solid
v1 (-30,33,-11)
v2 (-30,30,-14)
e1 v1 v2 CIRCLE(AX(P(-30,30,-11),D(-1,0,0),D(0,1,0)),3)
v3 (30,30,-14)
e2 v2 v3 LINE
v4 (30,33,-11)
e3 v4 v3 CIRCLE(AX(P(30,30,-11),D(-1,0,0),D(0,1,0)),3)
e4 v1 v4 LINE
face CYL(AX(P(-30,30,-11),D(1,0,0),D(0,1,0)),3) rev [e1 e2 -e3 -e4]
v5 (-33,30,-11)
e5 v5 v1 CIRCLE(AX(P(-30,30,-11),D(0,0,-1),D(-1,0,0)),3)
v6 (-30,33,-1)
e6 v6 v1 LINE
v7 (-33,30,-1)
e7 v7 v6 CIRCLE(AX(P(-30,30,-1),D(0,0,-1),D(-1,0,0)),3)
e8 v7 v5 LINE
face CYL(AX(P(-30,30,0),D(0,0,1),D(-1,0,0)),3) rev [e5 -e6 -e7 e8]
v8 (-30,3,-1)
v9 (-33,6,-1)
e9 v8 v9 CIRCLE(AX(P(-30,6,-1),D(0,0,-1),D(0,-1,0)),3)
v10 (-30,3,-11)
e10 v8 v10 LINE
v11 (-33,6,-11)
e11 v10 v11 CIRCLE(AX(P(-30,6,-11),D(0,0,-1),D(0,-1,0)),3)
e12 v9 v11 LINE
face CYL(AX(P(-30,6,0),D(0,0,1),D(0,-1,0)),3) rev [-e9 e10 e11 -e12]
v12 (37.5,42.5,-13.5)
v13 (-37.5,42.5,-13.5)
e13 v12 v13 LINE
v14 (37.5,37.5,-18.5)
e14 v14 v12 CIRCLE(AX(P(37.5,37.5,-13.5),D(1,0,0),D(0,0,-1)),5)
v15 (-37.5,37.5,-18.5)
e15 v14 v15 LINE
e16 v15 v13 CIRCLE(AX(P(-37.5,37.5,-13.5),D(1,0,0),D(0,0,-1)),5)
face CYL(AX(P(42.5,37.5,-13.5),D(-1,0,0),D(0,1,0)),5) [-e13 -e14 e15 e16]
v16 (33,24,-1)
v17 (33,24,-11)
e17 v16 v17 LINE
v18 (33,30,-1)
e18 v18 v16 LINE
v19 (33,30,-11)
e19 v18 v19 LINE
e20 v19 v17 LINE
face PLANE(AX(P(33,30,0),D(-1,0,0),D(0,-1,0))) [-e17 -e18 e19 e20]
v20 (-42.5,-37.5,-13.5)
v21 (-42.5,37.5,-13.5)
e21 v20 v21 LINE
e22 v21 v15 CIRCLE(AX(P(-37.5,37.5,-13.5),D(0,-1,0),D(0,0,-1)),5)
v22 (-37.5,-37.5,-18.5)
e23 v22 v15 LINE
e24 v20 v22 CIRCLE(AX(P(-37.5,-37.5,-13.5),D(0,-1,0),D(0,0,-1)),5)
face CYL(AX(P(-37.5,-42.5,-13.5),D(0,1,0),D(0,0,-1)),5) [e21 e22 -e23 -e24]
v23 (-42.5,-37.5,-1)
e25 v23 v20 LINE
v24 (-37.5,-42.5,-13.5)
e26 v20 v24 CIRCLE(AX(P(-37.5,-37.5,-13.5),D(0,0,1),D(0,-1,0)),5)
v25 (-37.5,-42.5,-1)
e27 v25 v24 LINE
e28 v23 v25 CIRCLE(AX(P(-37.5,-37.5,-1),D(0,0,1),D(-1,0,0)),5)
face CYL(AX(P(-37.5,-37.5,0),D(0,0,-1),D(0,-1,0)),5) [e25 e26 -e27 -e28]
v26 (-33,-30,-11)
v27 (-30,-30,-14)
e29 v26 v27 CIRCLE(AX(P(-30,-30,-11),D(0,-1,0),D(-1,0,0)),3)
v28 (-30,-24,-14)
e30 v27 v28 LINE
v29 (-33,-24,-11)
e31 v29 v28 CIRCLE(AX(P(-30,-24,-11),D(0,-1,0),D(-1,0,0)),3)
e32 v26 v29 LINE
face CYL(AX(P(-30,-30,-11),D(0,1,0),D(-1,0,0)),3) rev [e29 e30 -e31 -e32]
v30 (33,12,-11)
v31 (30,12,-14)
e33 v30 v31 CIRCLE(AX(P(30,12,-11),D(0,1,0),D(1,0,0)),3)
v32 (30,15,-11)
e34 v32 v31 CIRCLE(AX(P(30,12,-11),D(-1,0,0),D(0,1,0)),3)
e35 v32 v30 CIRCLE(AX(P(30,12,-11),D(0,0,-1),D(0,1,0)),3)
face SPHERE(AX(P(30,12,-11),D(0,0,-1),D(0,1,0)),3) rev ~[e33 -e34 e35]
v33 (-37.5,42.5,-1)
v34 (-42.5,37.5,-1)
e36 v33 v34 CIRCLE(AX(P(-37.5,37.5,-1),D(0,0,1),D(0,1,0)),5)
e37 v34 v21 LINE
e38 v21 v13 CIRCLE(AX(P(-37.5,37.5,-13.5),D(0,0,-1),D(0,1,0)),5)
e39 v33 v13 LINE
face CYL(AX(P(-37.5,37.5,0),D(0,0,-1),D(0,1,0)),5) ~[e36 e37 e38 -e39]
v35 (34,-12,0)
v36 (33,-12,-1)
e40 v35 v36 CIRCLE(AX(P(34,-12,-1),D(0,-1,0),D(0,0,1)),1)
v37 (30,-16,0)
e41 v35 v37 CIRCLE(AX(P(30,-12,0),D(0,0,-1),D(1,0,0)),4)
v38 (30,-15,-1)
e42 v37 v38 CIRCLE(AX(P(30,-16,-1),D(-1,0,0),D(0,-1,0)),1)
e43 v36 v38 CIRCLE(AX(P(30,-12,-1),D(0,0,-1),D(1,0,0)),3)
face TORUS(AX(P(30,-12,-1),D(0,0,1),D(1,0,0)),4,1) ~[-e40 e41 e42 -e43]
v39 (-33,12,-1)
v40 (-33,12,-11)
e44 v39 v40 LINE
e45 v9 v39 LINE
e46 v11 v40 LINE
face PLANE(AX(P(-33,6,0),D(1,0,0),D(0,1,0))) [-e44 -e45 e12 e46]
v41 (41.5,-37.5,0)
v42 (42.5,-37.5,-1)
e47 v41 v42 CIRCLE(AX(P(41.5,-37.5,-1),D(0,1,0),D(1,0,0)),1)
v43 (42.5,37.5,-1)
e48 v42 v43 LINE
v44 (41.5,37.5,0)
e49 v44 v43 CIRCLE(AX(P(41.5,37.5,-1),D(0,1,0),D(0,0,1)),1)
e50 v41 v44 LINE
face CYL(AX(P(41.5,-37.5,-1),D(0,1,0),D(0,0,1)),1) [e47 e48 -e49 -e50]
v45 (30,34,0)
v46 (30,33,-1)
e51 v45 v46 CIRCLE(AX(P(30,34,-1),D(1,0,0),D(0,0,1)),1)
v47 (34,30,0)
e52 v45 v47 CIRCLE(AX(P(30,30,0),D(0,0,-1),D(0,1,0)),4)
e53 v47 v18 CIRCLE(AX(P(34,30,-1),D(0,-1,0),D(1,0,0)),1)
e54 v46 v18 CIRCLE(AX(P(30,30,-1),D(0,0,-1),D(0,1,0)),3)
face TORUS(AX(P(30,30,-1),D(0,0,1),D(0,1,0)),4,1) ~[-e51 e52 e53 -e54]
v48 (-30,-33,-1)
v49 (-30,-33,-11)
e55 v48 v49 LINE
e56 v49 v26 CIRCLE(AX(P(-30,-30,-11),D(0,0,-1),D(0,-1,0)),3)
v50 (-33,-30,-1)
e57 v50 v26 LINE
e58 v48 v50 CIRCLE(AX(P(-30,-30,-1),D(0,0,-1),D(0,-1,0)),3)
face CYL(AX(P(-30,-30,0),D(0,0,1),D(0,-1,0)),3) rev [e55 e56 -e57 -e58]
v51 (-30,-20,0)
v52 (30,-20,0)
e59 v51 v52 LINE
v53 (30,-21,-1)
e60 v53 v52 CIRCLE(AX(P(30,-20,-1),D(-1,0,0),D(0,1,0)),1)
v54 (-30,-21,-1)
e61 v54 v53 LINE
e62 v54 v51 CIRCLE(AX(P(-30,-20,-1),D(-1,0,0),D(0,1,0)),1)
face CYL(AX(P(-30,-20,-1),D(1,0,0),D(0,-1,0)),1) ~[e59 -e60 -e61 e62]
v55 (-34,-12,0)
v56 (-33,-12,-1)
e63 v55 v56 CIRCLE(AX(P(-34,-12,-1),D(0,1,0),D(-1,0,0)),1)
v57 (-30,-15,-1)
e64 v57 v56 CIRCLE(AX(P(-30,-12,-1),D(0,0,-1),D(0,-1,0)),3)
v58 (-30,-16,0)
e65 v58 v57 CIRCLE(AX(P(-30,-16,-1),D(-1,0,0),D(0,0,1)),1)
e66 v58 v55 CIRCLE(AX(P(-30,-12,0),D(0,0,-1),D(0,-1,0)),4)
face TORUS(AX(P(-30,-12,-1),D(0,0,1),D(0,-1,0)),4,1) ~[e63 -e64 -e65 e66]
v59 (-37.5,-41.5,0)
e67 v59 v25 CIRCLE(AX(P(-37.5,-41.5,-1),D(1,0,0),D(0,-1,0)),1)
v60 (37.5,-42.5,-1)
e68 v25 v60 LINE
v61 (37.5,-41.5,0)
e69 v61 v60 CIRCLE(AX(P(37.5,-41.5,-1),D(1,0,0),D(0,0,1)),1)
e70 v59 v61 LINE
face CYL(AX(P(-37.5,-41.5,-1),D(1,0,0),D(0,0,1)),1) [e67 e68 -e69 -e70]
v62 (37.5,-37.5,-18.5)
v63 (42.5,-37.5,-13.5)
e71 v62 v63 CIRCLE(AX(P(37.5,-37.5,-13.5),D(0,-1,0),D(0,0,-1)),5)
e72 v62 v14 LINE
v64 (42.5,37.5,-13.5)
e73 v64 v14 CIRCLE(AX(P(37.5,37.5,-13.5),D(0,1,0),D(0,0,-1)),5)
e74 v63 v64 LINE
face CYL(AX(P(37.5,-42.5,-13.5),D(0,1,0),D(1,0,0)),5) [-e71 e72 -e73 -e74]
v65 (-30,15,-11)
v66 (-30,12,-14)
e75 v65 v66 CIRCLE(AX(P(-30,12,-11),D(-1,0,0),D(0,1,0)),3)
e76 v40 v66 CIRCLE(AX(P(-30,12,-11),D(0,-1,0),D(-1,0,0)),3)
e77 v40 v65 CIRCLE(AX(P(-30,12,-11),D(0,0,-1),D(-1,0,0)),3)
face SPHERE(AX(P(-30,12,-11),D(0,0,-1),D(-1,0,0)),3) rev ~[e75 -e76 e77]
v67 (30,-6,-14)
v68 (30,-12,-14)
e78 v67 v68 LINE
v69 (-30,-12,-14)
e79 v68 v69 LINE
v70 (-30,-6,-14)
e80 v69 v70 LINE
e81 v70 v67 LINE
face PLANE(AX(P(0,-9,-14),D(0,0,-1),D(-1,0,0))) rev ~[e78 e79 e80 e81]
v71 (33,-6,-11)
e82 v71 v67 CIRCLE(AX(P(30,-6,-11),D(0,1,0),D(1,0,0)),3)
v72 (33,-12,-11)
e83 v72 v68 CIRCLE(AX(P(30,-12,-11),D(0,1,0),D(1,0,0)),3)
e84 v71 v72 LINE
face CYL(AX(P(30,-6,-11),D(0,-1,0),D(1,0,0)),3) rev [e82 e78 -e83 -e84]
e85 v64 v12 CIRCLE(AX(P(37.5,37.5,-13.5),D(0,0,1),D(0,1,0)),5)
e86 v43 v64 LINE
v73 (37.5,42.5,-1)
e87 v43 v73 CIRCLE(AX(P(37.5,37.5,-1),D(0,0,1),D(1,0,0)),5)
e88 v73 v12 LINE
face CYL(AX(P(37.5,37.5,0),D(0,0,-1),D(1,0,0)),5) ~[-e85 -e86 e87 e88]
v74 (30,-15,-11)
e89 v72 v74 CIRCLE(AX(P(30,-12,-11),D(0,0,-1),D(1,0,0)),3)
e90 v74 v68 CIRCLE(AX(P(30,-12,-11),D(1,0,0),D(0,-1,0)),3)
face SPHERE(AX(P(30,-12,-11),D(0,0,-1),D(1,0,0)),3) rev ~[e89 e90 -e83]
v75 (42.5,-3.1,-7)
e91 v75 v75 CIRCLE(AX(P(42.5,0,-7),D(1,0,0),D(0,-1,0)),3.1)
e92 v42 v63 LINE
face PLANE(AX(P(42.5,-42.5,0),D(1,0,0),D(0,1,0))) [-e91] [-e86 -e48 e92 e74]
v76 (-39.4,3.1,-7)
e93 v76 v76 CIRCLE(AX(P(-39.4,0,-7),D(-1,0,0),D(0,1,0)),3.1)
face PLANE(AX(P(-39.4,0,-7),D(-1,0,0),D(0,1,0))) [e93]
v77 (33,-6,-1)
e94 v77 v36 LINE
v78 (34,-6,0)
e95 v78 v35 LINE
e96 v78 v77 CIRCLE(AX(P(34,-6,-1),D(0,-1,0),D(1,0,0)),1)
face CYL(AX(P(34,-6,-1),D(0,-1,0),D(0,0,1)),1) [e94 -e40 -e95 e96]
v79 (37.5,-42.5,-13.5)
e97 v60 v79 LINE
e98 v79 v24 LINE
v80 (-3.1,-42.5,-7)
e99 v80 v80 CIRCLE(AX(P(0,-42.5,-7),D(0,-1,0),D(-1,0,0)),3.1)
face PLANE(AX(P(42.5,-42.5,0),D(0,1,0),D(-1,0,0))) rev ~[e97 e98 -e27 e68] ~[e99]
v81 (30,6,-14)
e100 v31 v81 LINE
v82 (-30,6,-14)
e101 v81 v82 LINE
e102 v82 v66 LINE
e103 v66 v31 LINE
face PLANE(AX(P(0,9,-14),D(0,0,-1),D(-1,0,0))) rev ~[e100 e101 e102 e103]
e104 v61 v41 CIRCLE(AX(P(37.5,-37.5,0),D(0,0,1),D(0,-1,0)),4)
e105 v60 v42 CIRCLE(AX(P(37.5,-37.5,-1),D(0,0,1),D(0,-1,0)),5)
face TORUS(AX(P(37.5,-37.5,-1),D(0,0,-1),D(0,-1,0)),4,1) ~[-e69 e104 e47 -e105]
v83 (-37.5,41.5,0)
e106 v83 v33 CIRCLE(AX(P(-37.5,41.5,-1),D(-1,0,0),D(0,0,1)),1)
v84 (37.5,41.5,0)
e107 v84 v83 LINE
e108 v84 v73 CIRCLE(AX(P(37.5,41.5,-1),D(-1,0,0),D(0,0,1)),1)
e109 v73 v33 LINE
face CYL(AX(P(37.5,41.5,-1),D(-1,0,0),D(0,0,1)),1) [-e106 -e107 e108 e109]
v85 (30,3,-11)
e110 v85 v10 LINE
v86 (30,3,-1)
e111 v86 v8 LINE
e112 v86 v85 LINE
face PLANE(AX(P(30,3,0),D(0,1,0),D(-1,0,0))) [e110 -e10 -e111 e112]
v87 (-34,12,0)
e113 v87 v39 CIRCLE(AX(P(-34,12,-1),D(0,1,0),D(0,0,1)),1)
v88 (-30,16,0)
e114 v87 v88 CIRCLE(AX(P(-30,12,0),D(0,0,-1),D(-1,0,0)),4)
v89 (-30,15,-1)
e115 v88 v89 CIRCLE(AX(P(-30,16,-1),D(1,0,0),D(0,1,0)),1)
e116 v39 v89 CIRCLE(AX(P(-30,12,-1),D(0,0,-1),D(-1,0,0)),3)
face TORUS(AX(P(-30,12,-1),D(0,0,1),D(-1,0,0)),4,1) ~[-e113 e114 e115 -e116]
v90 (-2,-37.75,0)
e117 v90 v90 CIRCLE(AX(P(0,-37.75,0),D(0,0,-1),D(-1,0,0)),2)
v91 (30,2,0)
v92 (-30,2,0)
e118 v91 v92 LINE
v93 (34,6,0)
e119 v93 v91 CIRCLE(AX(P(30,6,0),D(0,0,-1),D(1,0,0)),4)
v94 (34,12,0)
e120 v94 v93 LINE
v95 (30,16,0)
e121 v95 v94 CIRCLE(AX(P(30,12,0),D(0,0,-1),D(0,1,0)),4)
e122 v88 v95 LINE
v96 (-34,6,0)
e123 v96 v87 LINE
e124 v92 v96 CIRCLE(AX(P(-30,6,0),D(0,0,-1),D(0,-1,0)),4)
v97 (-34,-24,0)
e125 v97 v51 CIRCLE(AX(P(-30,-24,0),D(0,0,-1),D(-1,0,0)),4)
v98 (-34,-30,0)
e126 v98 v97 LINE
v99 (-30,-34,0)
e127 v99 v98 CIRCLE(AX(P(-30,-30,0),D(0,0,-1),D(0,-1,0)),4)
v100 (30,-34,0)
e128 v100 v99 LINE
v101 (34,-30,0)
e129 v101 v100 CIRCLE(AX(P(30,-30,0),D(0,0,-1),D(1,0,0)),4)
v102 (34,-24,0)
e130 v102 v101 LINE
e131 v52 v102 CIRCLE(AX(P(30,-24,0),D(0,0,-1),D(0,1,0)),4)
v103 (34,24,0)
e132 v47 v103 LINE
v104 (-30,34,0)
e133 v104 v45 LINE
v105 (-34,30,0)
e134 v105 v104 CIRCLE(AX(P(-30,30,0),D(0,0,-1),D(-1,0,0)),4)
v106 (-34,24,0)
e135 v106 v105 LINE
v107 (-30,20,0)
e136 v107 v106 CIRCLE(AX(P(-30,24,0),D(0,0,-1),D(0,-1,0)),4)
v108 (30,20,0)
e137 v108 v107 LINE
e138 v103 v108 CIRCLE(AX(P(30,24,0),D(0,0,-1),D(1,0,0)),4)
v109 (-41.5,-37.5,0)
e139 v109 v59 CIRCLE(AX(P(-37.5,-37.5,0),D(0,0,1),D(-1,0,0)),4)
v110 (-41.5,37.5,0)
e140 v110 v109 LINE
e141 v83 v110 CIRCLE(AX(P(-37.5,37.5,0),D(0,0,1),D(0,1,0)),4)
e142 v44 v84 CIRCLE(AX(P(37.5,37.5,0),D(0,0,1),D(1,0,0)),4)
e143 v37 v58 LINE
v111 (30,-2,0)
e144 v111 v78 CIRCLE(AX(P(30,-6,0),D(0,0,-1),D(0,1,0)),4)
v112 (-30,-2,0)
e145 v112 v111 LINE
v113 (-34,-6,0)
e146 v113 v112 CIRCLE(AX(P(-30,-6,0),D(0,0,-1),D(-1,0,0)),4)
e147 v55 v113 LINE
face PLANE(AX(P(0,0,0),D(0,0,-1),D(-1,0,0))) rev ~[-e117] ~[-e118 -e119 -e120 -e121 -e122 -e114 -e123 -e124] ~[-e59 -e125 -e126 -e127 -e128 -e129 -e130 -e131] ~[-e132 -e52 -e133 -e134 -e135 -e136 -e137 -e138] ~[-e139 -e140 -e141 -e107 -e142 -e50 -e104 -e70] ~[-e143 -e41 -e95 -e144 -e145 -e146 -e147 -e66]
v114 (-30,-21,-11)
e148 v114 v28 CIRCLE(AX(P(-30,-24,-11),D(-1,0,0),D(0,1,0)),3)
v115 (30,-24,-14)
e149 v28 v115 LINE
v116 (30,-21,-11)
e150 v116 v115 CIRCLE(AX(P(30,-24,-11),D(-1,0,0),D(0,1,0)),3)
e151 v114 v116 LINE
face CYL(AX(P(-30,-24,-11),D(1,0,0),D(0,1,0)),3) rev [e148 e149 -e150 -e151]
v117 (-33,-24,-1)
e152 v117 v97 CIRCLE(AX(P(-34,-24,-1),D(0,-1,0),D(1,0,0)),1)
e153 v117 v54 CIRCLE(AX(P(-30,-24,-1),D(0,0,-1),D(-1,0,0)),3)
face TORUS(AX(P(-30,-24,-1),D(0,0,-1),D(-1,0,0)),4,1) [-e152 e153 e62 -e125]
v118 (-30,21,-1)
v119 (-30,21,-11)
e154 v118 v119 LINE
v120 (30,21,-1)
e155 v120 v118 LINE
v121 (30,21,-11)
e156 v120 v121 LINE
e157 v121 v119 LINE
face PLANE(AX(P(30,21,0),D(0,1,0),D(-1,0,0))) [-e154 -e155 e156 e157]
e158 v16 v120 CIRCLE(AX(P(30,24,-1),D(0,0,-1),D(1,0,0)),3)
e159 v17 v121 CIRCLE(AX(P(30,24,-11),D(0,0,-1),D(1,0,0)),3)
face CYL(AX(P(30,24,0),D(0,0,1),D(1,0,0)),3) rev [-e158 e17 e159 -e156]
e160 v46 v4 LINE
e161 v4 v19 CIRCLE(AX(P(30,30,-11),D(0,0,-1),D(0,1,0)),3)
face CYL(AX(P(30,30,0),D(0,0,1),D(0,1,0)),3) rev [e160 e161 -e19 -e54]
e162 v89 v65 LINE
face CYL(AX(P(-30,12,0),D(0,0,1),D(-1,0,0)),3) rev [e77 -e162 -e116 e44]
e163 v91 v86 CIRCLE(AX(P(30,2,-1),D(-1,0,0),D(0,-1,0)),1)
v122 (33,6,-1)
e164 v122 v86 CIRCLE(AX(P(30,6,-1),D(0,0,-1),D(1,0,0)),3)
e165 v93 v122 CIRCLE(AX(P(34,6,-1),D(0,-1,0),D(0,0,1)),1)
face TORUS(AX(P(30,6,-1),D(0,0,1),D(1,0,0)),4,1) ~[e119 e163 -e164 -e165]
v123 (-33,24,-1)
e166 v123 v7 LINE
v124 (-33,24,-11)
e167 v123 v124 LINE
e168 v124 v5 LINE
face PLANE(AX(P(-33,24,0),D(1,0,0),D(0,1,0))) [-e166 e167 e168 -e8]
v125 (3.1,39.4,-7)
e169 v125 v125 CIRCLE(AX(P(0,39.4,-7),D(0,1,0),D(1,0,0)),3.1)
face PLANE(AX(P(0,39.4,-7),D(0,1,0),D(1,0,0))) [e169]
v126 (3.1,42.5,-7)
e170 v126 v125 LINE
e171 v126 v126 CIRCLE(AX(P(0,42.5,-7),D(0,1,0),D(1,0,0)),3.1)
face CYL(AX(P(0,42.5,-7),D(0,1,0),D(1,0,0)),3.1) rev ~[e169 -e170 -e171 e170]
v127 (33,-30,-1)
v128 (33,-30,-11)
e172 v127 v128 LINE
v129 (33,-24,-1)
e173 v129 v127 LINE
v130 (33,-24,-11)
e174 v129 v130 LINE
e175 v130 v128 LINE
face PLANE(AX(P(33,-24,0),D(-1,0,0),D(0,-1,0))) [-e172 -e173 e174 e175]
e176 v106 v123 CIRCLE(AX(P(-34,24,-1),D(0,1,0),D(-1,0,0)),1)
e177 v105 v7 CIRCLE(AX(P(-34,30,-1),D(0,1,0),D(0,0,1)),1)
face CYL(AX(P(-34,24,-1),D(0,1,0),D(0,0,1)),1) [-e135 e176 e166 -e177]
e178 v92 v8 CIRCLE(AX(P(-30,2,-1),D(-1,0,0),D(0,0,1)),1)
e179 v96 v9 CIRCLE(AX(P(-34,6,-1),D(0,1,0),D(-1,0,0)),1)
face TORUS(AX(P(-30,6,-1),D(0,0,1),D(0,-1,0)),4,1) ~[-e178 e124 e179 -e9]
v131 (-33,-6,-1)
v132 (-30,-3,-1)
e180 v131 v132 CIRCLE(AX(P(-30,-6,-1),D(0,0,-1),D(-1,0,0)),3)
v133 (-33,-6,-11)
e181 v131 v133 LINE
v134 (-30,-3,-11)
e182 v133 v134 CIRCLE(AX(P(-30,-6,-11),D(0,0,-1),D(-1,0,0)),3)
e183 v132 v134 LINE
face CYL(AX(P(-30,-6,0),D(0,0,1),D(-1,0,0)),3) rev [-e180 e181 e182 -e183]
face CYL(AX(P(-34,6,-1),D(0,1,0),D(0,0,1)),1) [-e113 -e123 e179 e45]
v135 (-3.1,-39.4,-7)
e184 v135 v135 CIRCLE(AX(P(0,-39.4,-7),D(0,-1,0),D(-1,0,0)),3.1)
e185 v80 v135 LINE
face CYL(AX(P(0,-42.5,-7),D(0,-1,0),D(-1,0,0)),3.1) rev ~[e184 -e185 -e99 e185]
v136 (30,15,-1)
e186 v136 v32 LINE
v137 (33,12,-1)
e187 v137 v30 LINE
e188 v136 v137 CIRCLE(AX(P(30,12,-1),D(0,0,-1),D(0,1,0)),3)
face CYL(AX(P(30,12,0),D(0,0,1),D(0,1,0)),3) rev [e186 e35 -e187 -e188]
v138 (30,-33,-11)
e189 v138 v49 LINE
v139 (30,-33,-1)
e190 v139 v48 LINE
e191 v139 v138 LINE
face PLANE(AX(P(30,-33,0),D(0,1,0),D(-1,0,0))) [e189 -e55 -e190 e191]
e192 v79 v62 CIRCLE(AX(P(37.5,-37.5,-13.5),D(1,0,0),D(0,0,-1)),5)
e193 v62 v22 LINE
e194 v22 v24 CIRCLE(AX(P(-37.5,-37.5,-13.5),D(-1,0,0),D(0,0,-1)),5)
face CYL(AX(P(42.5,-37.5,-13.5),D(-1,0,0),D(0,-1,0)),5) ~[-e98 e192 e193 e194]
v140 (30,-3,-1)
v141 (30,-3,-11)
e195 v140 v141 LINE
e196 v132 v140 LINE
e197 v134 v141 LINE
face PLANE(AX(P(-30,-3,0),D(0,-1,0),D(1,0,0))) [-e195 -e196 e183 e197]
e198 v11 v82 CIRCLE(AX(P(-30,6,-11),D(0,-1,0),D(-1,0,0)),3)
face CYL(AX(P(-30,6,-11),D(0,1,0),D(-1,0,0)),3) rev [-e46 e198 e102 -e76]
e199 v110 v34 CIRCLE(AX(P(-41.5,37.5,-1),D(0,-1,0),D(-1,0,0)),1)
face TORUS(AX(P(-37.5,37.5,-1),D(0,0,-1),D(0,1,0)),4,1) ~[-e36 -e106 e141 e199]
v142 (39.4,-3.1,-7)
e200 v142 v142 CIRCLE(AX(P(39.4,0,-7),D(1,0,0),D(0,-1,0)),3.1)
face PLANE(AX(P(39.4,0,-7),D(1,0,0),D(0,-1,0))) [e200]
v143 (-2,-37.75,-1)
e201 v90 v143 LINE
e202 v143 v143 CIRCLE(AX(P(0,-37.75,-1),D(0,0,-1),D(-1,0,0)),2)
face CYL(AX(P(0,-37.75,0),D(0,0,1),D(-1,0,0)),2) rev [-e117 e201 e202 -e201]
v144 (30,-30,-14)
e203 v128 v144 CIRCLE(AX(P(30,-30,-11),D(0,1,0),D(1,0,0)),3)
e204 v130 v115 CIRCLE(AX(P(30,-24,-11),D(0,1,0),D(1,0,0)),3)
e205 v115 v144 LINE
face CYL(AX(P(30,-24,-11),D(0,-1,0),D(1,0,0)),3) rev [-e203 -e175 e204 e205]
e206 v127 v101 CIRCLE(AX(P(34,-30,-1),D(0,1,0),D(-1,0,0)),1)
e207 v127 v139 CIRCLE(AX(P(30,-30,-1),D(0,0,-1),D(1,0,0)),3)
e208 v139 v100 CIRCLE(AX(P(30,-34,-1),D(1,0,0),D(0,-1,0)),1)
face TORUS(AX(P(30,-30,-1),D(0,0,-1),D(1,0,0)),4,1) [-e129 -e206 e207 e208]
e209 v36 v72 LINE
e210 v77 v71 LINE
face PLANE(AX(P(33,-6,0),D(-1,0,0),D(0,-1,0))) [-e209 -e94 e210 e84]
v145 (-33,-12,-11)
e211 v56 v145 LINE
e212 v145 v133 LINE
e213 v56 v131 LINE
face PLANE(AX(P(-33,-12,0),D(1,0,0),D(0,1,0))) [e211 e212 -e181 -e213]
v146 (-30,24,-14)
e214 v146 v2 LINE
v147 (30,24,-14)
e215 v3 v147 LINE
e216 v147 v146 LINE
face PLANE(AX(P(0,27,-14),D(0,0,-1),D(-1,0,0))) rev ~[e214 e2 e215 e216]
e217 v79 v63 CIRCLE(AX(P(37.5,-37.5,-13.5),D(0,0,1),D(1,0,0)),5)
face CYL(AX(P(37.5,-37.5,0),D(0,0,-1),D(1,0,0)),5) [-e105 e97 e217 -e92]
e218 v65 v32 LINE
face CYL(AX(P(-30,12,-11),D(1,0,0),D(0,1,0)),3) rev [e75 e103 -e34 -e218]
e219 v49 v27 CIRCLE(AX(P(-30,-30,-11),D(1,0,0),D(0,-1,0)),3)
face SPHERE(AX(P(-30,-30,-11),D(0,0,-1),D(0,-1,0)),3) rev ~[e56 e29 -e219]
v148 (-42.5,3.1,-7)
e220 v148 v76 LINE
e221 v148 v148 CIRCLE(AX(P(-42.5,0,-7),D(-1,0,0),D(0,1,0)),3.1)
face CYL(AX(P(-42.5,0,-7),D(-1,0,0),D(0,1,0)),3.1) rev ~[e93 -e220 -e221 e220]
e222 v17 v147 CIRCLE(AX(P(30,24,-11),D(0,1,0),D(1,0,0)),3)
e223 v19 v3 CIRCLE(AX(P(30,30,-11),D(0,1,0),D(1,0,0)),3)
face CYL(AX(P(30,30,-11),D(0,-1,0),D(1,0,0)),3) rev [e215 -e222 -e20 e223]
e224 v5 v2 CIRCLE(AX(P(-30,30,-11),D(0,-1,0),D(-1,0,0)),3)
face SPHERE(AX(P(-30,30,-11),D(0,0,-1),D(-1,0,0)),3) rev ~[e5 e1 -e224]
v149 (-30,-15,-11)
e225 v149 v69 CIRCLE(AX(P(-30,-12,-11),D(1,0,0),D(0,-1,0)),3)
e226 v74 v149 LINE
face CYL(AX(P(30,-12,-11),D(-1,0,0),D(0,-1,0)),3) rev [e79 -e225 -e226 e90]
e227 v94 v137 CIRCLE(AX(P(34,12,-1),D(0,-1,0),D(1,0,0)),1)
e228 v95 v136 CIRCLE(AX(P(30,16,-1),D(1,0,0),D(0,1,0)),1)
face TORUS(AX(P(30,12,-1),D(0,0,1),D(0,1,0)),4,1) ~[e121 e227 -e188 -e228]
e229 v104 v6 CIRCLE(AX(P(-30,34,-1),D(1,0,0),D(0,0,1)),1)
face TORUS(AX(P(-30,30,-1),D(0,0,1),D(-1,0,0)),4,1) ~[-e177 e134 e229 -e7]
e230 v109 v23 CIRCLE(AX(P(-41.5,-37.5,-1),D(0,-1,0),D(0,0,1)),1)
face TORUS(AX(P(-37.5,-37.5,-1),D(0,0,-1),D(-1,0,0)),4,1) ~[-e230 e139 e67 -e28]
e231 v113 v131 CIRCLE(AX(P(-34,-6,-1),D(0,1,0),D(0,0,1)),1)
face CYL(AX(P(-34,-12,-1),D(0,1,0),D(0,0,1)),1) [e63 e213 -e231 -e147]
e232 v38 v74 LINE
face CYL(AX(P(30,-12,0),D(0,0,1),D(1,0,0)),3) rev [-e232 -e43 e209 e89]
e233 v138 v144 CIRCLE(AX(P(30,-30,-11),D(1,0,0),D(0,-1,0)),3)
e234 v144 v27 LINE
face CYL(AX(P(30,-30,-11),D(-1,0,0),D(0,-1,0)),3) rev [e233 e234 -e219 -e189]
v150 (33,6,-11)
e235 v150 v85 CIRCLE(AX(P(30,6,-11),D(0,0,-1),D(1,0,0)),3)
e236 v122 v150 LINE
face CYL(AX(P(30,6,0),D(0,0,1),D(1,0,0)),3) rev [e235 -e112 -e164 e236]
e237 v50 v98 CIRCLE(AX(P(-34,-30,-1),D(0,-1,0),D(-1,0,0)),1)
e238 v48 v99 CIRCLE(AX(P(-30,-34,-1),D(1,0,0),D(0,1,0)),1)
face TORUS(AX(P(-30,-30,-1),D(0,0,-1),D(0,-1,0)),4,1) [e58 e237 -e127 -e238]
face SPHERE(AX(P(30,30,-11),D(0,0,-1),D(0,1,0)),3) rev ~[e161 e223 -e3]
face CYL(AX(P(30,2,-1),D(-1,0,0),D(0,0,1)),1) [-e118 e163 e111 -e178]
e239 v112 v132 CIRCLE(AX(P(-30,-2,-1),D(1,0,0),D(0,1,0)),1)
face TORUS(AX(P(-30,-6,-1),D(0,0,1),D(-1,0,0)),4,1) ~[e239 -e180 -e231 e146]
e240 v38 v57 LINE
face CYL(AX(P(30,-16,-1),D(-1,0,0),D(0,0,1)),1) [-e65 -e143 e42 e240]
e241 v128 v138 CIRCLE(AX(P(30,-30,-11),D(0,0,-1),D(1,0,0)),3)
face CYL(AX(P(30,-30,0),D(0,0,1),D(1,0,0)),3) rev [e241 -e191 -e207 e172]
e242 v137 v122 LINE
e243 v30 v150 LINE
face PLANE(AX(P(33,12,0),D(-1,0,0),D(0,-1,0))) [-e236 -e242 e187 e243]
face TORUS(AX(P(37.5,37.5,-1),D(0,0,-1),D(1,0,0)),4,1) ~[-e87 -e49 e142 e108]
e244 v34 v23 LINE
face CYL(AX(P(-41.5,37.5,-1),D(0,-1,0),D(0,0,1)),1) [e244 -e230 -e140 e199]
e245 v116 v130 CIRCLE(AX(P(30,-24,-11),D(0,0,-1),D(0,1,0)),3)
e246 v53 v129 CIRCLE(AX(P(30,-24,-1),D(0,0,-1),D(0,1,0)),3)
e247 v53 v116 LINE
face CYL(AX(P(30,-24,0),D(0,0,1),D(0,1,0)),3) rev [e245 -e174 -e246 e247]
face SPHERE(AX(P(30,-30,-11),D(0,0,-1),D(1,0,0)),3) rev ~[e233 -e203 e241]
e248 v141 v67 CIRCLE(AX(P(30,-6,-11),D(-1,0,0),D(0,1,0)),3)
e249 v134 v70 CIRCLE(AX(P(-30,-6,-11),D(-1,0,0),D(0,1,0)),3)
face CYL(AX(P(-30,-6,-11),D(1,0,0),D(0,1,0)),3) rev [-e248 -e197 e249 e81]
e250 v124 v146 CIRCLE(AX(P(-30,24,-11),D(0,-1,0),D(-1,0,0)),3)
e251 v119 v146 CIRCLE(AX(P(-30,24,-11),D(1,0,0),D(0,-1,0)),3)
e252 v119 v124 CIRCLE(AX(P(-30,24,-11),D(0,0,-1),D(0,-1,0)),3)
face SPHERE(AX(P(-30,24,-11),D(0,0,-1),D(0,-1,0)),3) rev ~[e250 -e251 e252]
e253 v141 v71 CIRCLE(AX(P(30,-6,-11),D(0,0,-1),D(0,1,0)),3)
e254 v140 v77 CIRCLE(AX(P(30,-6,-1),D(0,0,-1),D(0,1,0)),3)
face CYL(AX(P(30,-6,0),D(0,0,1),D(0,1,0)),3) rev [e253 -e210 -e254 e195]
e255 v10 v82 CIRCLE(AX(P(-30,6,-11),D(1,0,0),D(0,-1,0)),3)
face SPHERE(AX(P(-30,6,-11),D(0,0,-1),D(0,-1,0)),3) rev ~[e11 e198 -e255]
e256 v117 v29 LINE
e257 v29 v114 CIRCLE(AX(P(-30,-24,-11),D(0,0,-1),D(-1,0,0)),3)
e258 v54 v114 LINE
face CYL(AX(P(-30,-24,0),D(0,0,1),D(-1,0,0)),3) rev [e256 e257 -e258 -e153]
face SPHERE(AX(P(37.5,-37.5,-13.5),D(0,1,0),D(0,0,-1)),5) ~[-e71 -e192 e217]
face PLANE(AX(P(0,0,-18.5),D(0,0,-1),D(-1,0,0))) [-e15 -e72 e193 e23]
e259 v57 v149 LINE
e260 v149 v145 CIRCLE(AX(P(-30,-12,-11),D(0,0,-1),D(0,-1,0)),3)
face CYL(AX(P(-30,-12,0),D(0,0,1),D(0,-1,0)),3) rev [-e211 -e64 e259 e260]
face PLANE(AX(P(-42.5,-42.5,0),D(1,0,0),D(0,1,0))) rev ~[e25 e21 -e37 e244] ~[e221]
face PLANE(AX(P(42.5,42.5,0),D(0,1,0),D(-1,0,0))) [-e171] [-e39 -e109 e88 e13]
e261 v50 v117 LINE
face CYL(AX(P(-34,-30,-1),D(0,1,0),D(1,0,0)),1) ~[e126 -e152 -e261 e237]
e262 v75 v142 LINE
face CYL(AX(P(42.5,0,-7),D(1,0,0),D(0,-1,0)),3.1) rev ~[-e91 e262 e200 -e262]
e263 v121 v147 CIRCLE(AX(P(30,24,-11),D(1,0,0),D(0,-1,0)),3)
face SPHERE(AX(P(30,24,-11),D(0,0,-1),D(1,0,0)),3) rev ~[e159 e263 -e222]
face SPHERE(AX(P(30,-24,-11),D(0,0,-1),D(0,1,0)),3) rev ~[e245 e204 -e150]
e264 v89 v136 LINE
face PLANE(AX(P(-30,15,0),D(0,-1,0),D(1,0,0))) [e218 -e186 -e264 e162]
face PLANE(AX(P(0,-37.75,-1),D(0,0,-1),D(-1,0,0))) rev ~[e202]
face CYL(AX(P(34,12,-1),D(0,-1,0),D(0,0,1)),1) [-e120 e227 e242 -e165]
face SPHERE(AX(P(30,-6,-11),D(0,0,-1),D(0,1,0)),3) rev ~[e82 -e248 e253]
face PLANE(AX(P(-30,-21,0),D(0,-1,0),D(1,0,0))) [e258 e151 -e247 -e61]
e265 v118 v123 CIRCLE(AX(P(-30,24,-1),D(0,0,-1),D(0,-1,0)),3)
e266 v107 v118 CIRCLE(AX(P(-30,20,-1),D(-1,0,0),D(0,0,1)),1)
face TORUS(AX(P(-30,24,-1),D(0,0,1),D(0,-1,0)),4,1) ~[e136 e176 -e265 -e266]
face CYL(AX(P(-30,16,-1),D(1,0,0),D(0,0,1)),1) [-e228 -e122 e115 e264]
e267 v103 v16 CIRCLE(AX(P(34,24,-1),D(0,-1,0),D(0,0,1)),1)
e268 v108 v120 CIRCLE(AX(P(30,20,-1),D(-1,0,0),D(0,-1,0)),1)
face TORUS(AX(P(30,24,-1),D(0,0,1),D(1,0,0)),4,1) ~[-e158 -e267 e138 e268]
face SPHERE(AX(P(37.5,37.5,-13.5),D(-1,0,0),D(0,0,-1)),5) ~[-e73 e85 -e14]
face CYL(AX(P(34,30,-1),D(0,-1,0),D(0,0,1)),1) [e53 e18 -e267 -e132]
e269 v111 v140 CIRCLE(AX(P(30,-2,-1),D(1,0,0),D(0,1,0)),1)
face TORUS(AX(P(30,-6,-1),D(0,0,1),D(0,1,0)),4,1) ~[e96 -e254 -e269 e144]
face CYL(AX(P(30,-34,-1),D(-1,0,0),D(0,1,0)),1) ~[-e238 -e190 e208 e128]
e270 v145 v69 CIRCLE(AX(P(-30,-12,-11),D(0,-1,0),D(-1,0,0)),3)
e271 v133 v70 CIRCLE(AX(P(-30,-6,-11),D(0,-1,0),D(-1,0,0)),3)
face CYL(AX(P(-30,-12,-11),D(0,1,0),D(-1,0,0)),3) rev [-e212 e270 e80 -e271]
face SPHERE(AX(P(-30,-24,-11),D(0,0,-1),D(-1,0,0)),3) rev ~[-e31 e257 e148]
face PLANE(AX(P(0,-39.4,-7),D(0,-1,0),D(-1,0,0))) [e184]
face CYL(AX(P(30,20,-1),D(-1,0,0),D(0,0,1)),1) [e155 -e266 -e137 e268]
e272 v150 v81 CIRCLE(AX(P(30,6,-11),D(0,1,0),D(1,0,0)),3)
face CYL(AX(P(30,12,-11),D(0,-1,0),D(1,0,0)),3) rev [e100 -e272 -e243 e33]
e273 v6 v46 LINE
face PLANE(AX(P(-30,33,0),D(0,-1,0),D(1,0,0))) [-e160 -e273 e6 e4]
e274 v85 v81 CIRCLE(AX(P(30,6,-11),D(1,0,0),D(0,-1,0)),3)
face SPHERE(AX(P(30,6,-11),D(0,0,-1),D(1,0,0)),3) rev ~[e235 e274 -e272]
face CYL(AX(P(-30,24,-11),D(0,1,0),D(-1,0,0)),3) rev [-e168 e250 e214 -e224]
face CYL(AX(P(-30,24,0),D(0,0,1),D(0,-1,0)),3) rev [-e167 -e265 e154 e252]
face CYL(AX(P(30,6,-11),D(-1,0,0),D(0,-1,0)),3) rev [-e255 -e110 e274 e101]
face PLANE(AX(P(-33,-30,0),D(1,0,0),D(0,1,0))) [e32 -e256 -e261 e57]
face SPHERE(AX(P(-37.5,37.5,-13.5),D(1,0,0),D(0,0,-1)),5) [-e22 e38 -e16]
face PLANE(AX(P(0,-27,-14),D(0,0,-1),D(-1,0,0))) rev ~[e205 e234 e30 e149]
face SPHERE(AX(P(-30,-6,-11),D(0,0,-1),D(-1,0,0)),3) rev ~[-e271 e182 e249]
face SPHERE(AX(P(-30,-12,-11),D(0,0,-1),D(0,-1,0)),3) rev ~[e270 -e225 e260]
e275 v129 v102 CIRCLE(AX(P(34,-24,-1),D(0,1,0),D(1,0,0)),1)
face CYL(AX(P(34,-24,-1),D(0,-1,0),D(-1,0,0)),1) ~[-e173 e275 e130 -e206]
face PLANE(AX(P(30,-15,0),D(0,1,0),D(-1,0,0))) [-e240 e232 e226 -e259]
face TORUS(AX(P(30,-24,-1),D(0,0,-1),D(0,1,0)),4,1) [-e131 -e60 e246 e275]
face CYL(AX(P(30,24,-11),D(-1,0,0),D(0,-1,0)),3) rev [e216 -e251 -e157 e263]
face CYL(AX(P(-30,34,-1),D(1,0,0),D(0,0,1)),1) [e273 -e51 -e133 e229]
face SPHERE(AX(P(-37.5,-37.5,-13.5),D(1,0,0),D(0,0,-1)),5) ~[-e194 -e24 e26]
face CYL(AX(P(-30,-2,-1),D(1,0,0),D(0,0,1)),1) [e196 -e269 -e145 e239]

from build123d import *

# Parameters (mm, degrees)
F0_W      = 85
F0_H      = 85
F0_R      = 2
F3_DEPTH  = 18.5
F4_DEPTH  = 14
F5_R      = 5
F6_R      = 3
F7_R      = 1
F8_R      = 3.1
F9_DEPTH  = 3.1
F10_R     = 3.1
F11_DEPTH = 3.1
F12_R     = 3.1
F13_DEPTH = 3.1
F14_R     = 3.1
F15_DEPTH = 3.1
F16_DEPTH = 1
F17_ANGLE = 180


# Not quite as in the source:
# - a feature names something its author has since deleted; it is built from what else it names


with BuildPart() as f3:
    # F0 (on Top) → F3 (new body)
    with BuildSketch(Plane.XY):
        Rectangle(F0_W, F0_H)
        with Locations((0, -37.75)):
            Circle(F0_R, mode=Mode.SUBTRACT)
        with BuildLine():
            Line((-33, -30), (-33, -24))
            ThreePointArc((-33, -24), (-32.1213203436, -21.8786796564), (-30, -21))
            Line((-30, -21), (30, -21))
            ThreePointArc((30, -21), (32.1213203436, -21.8786796564), (33, -24))
            Line((33, -24), (33, -30))
            ThreePointArc((33, -30), (32.1213203436, -32.1213203436), (30, -33))
            Line((30, -33), (-30, -33))
            ThreePointArc((-30, -33), (-32.1213203436, -32.1213203436), (-33, -30))
        make_face(mode=Mode.SUBTRACT)
        with BuildLine():
            Line((-33, -12), (-33, -6))
            ThreePointArc((-33, -6), (-32.1213203436, -3.8786796564), (-30, -3))
            Line((-30, -3), (30, -3))
            ThreePointArc((30, -3), (32.1213203436, -3.8786796564), (33, -6))
            Line((33, -6), (33, -12))
            ThreePointArc((33, -12), (32.1213203436, -14.1213203436), (30, -15))
            Line((30, -15), (-30, -15))
            ThreePointArc((-30, -15), (-32.1213203436, -14.1213203436), (-33, -12))
        make_face(mode=Mode.SUBTRACT)
        with BuildLine():
            Line((-33, 6), (-33, 12))
            ThreePointArc((-33, 12), (-32.1213203436, 14.1213203436), (-30, 15))
            Line((-30, 15), (30, 15))
            ThreePointArc((30, 15), (32.1213203436, 14.1213203436), (33, 12))
            Line((33, 12), (33, 6))
            ThreePointArc((33, 6), (32.1213203436, 3.8786796564), (30, 3))
            Line((30, 3), (-30, 3))
            ThreePointArc((-30, 3), (-32.1213203436, 3.8786796564), (-33, 6))
        make_face(mode=Mode.SUBTRACT)
        with BuildLine():
            ThreePointArc((-33, 30), (-32.1213203436, 32.1213203436), (-30, 33))
            Line((-30, 33), (30, 33))
            ThreePointArc((30, 33), (32.1213203436, 32.1213203436), (33, 30))
            Line((33, 30), (33, 24))
            ThreePointArc((33, 24), (32.1213203436, 21.8786796564), (30, 21))
            Line((30, 21), (-30, 21))
            ThreePointArc((-30, 21), (-32.1213203436, 21.8786796564), (-33, 24))
            Line((-33, 24), (-33, 30))
        make_face(mode=Mode.SUBTRACT)
        with BuildLine():
            Line((30, 33), (-30, 33))
            ThreePointArc((-30, 33), (-32.1213203436, 32.1213203436), (-33, 30))
            Line((-33, 30), (-33, 24))
            ThreePointArc((-33, 24), (-32.1213203436, 21.8786796564), (-30, 21))
            Line((-30, 21), (30, 21))
            ThreePointArc((30, 21), (32.1213203436, 21.8786796564), (33, 24))
            Line((33, 24), (33, 30))
            ThreePointArc((33, 30), (32.1213203436, 32.1213203436), (30, 33))
        make_face()
        with BuildLine():
            ThreePointArc((-30, 15), (-32.1213203436, 14.1213203436), (-33, 12))
            Line((-33, 12), (-33, 6))
            ThreePointArc((-33, 6), (-32.1213203436, 3.8786796564), (-30, 3))
            Line((-30, 3), (30, 3))
            ThreePointArc((30, 3), (32.1213203436, 3.8786796564), (33, 6))
            Line((33, 6), (33, 12))
            ThreePointArc((33, 12), (32.1213203436, 14.1213203436), (30, 15))
            Line((30, 15), (-30, 15))
        make_face()
        with BuildLine():
            ThreePointArc((-30, -3), (-32.1213203436, -3.8786796564), (-33, -6))
            Line((-33, -6), (-33, -12))
            ThreePointArc((-33, -12), (-32.1213203436, -14.1213203436), (-30, -15))
            Line((-30, -15), (30, -15))
            ThreePointArc((30, -15), (32.1213203436, -14.1213203436), (33, -12))
            Line((33, -12), (33, -6))
            ThreePointArc((33, -6), (32.1213203436, -3.8786796564), (30, -3))
            Line((30, -3), (-30, -3))
        make_face()
        with BuildLine():
            ThreePointArc((-30, -21), (-32.1213203436, -21.8786796564), (-33, -24))
            Line((-33, -24), (-33, -30))
            ThreePointArc((-33, -30), (-32.1213203436, -32.1213203436), (-30, -33))
            Line((-30, -33), (30, -33))
            ThreePointArc((30, -33), (32.1213203436, -32.1213203436), (33, -30))
            Line((33, -30), (33, -24))
            ThreePointArc((33, -24), (32.1213203436, -21.8786796564), (30, -21))
            Line((30, -21), (-30, -21))
        make_face()
        with Locations((0, -37.75)):
            Circle(F0_R)
    extrude(amount=F3_DEPTH)

    # F0 (on Top) → F4 (cut)
    with BuildSketch(Plane.XY):
        with BuildLine():
            Line((30, 33), (-30, 33))
            ThreePointArc((-30, 33), (-32.1213203436, 32.1213203436), (-33, 30))
            Line((-33, 30), (-33, 24))
            ThreePointArc((-33, 24), (-32.1213203436, 21.8786796564), (-30, 21))
            Line((-30, 21), (30, 21))
            ThreePointArc((30, 21), (32.1213203436, 21.8786796564), (33, 24))
            Line((33, 24), (33, 30))
            ThreePointArc((33, 30), (32.1213203436, 32.1213203436), (30, 33))
        make_face()
        with BuildLine():
            ThreePointArc((-30, 15), (-32.1213203436, 14.1213203436), (-33, 12))
            Line((-33, 12), (-33, 6))
            ThreePointArc((-33, 6), (-32.1213203436, 3.8786796564), (-30, 3))
            Line((-30, 3), (30, 3))
            ThreePointArc((30, 3), (32.1213203436, 3.8786796564), (33, 6))
            Line((33, 6), (33, 12))
            ThreePointArc((33, 12), (32.1213203436, 14.1213203436), (30, 15))
            Line((30, 15), (-30, 15))
        make_face()
        with BuildLine():
            ThreePointArc((-30, -3), (-32.1213203436, -3.8786796564), (-33, -6))
            Line((-33, -6), (-33, -12))
            ThreePointArc((-33, -12), (-32.1213203436, -14.1213203436), (-30, -15))
            Line((-30, -15), (30, -15))
            ThreePointArc((30, -15), (32.1213203436, -14.1213203436), (33, -12))
            Line((33, -12), (33, -6))
            ThreePointArc((33, -6), (32.1213203436, -3.8786796564), (30, -3))
            Line((30, -3), (-30, -3))
        make_face()
        with BuildLine():
            ThreePointArc((-30, -21), (-32.1213203436, -21.8786796564), (-33, -24))
            Line((-33, -24), (-33, -30))
            ThreePointArc((-33, -30), (-32.1213203436, -32.1213203436), (-30, -33))
            Line((-30, -33), (30, -33))
            ThreePointArc((30, -33), (32.1213203436, -32.1213203436), (33, -30))
            Line((33, -30), (33, -24))
            ThreePointArc((33, -24), (32.1213203436, -21.8786796564), (30, -21))
            Line((30, -21), (-30, -21))
        make_face()
    extrude(amount=F4_DEPTH, mode=Mode.SUBTRACT)

    # F5
    f5_edges = [f3.edges().sort_by_distance(p)[0] for p in [
        (0, 42.5, 18.5),
        (-42.5, 0, 18.5),
        (0, -42.5, 18.5),
        (42.5, 0, 18.5),
        (42.5, 42.5, 9.25),
        (-42.5, 42.5, 9.25),
        (-42.5, -42.5, 9.25),
        (42.5, -42.5, 9.25),
    ]]
    fillet(f5_edges, radius=F5_R)

    # F6
    f6_edges = [f3.edges().sort_by_distance(p)[0] for p in [
        (0, 33, 14),
        (-32.12132, 32.12132, 14),
        (-33, 27, 14),
        (-32.12132, 21.87868, 14),
        (0, 21, 14),
        (32.12132, 21.87868, 14),
        (33, 27, 14),
        (32.12132, 32.12132, 14),
        (-32.12132, 14.12132, 14),
        (-33, 9, 14),
        (-32.12132, 3.87868, 14),
        (0, 3, 14),
        (32.12132, 3.87868, 14),
        (33, 9, 14),
        (32.12132, 14.12132, 14),
        (0, 15, 14),
        (-32.12132, -3.87868, 14),
        (-33, -9, 14),
        (-32.12132, -14.12132, 14),
        (0, -15, 14),
        (32.12132, -14.12132, 14),
        (33, -9, 14),
        (32.12132, -3.87868, 14),
        (0, -3, 14),
        (-32.12132, -21.87868, 14),
        (-33, -27, 14),
        (-32.12132, -32.12132, 14),
        (0, -33, 14),
        (32.12132, -32.12132, 14),
        (33, -27, 14),
        (32.12132, -21.87868, 14),
        (0, -21, 14),
    ]]
    fillet(f6_edges, radius=F6_R)

    # F7
    f7_edges = [f3.edges().sort_by_distance(p)[0] for p in [
        (0, 42.5, 0),
        (41.035534, 41.035534, 0),
        (-41.035534, 41.035534, 0),
        (42.5, 0, 0),
        (-42.5, 0, 0),
        (41.035534, -41.035534, 0),
        (-41.035534, -41.035534, 0),
        (0, -42.5, 0),
        (-32.12132, -21.87868, 0),
        (-33, -27, 0),
        (-32.12132, -32.12132, 0),
        (0, -33, 0),
        (32.12132, -32.12132, 0),
        (33, -27, 0),
        (32.12132, -21.87868, 0),
        (0, -21, 0),
        (-32.12132, -3.87868, 0),
        (-33, -9, 0),
        (-32.12132, -14.12132, 0),
        (0, -15, 0),
        (32.12132, -14.12132, 0),
        (33, -9, 0),
        (32.12132, -3.87868, 0),
        (0, -3, 0),
        (-32.12132, 14.12132, 0),
        (-33, 9, 0),
        (-32.12132, 3.87868, 0),
        (0, 3, 0),
        (32.12132, 3.87868, 0),
        (33, 9, 0),
        (32.12132, 14.12132, 0),
        (0, 15, 0),
        (0, 33, 0),
        (-32.12132, 32.12132, 0),
        (-33, 27, 0),
        (-32.12132, 21.87868, 0),
        (0, 21, 0),
        (32.12132, 21.87868, 0),
        (33, 27, 0),
        (32.12132, 32.12132, 0),
    ]]
    fillet(f7_edges, radius=F7_R)

    # F8 (on face) → F9 (cut)
    with BuildSketch(Plane.XZ.offset(42.5)):
        with Locations((0, 7)):
            Circle(F8_R)
    extrude(amount=-F9_DEPTH, mode=Mode.SUBTRACT)

    # F10 (on face) → F11 (cut)
    with BuildSketch(Plane(origin=(0, 42.5, 0), x_dir=(-1, 0, 0), z_dir=(0, 1, 0))):
        with Locations((0, 7)):
            Circle(F10_R)
    extrude(amount=-F11_DEPTH, mode=Mode.SUBTRACT)

    # F12 (on face) → F13 (cut)
    with BuildSketch(Plane(origin=(-42.5, 0, 0), x_dir=(0, -1, 0), z_dir=(-1, 0, 0))):
        with Locations((0, 7)):
            Circle(F12_R)
    extrude(amount=-F13_DEPTH, mode=Mode.SUBTRACT)

    # F14 (on face) → F15 (cut)
    with BuildSketch(Plane.YZ.offset(42.5)):
        with Locations((0, 7)):
            Circle(F14_R)
    extrude(amount=-F15_DEPTH, mode=Mode.SUBTRACT)

    # F0 (on Top) → F16 (cut)
    with BuildSketch(Plane.XY):
        with Locations((0, -37.75)):
            Circle(F0_R)
    extrude(amount=F16_DEPTH, mode=Mode.SUBTRACT)


with BuildPart() as f3_1:
    # F17: moved
    add(f3.part.rotate(Axis((0, 0, 0), (0, 1, 0)), F17_ANGLE))


solid = f3_1.part
